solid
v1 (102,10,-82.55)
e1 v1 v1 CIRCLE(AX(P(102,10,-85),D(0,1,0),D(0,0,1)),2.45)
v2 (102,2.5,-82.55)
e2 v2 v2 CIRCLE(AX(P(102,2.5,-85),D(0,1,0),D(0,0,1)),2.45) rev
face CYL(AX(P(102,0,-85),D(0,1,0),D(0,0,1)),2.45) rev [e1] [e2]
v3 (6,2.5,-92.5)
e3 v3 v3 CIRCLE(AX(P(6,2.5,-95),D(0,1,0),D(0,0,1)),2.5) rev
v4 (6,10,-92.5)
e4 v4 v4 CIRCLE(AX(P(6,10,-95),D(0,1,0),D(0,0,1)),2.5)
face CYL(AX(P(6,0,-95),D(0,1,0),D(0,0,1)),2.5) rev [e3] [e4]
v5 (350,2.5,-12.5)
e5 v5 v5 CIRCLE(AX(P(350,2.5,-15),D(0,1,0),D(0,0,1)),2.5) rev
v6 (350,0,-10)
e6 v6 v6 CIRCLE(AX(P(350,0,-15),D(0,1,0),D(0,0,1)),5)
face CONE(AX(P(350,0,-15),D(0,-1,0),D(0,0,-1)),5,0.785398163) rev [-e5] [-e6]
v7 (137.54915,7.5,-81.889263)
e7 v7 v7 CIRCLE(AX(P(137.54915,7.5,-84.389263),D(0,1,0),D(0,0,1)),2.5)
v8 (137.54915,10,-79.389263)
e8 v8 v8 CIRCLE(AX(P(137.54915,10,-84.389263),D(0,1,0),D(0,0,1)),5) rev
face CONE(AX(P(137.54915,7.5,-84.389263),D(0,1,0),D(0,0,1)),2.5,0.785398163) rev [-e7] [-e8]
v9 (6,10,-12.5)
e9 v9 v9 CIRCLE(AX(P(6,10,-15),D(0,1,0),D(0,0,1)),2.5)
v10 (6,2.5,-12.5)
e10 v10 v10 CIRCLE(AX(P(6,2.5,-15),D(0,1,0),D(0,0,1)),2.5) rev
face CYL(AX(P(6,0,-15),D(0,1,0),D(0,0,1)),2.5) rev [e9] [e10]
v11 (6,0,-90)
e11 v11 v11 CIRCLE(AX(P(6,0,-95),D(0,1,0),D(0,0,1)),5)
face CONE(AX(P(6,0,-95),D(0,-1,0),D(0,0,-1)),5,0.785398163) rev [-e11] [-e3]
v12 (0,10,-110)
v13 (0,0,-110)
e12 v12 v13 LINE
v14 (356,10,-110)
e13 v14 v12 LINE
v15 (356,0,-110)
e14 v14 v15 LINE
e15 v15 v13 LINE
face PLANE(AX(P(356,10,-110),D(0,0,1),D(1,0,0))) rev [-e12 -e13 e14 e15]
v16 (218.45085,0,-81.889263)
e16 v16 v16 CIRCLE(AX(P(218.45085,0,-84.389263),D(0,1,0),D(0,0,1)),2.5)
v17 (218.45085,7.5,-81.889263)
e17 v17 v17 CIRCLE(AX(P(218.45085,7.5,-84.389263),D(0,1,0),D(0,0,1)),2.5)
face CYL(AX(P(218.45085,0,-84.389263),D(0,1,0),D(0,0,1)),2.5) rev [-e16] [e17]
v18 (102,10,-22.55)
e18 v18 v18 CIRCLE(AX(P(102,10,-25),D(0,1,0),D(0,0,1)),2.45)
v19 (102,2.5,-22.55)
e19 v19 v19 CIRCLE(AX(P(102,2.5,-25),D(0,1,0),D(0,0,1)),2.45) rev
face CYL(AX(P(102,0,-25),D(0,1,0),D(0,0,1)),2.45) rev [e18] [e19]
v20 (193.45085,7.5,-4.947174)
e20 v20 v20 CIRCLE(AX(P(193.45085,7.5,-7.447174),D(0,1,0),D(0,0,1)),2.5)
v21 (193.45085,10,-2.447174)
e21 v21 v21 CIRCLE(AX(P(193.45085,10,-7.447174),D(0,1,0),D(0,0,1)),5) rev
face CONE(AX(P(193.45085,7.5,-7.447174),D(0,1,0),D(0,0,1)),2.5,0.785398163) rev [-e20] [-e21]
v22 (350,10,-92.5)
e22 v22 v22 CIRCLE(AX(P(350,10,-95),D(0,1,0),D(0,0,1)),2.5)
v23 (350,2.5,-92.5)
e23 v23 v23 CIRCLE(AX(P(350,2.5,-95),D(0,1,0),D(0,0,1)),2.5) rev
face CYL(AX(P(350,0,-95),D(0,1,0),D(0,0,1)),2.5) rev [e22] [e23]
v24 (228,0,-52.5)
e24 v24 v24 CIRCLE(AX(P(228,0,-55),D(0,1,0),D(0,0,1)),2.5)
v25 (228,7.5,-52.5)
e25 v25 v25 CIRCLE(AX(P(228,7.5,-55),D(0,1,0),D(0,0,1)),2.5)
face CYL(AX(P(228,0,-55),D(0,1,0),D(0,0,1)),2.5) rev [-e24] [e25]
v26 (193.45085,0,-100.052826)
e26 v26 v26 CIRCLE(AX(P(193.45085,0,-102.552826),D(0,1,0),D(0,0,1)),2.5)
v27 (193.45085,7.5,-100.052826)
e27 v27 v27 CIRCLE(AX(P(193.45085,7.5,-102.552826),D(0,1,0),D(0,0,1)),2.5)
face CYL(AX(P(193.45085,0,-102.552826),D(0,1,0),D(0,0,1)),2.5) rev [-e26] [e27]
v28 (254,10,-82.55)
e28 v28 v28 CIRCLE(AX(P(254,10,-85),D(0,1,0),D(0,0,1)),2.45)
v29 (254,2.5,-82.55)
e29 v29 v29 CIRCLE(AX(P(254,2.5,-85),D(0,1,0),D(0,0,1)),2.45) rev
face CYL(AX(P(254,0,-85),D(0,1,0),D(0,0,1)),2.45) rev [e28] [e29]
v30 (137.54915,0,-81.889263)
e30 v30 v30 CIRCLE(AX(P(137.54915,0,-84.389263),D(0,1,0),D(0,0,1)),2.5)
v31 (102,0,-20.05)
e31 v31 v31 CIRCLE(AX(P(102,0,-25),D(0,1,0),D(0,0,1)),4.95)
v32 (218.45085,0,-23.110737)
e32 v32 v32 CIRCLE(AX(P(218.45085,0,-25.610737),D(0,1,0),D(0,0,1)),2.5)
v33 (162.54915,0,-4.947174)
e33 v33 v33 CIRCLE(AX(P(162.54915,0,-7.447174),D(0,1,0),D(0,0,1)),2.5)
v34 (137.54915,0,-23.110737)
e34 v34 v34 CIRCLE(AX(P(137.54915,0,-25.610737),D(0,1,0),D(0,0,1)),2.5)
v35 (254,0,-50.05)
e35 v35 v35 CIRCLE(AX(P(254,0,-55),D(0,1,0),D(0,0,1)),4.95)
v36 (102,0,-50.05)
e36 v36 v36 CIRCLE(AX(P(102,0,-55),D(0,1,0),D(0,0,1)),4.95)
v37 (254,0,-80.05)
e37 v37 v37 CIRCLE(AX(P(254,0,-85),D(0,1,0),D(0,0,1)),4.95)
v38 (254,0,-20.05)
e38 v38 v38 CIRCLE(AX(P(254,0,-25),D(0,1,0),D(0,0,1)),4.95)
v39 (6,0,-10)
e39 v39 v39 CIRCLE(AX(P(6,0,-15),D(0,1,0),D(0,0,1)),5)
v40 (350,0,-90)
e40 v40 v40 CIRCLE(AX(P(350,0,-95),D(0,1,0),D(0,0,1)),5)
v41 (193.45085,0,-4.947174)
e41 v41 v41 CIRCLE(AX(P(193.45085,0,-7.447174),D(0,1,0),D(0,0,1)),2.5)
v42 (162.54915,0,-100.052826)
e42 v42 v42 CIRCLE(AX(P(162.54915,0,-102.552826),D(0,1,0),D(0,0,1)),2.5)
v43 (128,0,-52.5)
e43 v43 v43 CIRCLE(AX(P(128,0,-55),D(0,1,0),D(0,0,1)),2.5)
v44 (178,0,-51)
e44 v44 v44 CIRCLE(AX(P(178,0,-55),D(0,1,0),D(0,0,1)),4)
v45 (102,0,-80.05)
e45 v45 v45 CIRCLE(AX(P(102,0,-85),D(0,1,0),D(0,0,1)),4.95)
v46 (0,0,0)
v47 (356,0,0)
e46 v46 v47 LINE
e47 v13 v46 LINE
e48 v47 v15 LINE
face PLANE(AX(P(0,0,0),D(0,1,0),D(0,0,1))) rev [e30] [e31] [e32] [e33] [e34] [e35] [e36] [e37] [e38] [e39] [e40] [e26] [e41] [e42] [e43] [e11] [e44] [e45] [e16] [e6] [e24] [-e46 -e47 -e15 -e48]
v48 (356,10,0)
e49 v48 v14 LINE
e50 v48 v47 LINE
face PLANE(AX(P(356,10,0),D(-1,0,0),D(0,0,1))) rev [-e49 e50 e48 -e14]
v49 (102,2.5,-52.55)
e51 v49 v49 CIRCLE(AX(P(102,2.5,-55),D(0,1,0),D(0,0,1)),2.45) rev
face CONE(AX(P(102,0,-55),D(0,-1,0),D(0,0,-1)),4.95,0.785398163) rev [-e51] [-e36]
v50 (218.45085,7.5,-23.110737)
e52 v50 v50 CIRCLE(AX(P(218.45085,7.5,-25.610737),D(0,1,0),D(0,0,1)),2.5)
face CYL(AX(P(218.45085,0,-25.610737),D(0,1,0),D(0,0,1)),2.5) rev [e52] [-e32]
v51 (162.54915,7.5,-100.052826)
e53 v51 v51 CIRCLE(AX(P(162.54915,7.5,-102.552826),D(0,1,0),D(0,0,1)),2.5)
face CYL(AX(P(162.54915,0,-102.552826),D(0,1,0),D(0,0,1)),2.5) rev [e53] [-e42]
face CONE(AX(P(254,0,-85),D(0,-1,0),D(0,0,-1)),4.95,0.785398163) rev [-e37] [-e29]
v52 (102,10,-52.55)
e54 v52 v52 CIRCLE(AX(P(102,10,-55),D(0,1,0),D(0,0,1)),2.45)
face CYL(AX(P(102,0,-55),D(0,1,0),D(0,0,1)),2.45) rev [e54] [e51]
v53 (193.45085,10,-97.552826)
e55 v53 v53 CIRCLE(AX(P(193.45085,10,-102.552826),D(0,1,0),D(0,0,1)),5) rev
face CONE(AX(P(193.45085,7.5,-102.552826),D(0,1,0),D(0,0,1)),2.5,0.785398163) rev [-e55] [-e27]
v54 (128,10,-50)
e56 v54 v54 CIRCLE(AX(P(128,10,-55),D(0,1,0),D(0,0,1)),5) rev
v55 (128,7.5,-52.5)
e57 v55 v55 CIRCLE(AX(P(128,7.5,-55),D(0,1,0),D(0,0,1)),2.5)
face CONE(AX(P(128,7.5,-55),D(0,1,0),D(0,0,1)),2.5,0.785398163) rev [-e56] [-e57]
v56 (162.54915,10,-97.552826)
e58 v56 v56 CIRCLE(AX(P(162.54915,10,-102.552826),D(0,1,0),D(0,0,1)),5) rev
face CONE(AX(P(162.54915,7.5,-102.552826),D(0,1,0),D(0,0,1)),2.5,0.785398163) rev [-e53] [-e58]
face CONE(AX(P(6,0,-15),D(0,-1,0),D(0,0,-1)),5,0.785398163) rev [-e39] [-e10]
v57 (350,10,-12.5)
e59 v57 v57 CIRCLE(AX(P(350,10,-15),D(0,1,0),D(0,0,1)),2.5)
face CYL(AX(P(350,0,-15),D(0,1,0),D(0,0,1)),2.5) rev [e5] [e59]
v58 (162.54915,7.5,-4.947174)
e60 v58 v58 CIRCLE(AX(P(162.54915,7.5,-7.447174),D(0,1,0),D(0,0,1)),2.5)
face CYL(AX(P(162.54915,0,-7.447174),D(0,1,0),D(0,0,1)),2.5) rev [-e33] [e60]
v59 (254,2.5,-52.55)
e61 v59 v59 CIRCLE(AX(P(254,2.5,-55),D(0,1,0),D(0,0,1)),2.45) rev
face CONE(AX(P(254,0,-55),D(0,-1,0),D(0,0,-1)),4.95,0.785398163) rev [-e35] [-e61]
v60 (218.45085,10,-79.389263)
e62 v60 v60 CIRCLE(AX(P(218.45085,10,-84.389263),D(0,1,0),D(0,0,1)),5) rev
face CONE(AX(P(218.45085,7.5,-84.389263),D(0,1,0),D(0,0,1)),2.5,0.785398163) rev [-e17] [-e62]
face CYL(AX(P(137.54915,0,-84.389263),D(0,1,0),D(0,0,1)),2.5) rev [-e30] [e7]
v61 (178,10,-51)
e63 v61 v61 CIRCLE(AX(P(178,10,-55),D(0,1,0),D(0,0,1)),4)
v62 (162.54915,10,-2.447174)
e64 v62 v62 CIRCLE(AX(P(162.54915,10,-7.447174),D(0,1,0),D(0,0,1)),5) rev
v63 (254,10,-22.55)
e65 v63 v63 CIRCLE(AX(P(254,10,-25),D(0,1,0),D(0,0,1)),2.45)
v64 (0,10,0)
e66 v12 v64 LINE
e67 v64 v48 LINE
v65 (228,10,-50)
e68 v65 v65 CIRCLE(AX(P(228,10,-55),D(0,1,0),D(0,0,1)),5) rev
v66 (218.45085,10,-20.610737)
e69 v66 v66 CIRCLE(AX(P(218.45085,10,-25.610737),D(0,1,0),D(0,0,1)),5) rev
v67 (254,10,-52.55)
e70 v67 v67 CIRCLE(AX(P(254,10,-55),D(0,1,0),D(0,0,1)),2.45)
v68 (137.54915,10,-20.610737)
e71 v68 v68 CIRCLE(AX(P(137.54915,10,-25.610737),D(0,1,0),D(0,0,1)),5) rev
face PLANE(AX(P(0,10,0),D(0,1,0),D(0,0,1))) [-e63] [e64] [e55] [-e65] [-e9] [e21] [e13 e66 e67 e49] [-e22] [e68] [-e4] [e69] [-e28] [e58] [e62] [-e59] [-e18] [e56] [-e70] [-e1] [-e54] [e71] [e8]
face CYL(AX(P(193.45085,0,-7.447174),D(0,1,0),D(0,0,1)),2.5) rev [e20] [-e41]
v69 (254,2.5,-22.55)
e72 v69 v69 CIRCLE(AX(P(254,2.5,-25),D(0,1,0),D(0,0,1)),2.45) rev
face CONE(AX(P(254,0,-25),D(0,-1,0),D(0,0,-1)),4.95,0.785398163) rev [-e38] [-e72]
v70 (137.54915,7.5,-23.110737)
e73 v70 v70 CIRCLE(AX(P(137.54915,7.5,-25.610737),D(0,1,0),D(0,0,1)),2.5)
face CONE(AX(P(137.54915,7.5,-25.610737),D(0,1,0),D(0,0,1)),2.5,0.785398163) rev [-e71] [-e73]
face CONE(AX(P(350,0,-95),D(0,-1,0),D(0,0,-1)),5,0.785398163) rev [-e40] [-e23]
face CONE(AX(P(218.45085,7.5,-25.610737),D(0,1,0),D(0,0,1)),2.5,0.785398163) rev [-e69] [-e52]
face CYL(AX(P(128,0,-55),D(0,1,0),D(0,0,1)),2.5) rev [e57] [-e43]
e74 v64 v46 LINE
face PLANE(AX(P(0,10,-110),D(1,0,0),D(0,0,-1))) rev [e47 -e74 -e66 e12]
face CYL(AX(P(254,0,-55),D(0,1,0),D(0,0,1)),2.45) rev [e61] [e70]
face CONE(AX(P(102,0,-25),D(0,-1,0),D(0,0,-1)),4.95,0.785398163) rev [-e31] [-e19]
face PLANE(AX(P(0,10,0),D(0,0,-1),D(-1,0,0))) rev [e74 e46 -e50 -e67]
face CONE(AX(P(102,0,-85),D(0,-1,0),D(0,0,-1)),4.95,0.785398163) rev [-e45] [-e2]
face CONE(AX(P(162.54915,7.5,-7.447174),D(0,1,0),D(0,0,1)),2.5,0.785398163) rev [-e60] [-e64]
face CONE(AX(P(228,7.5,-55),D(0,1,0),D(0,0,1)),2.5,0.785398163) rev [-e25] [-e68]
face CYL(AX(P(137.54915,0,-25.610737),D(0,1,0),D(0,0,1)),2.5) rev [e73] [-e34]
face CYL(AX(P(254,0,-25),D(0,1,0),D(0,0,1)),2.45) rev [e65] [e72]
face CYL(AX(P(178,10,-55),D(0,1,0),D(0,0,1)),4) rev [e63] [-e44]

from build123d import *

# Parameters (mm, degrees)
SKIZZE3_W                       = 356
SKIZZE3_H                       = 110
AUFSATZ_LINEAR_AUSTRAGEN1_DEPTH = 10
SKIZZE4_R                       = 2.5
SCHNITT_LINEAR_AUSTRAGEN1_DEPTH = 373.741197079
SKIZZE5_R                       = 2.45
SCHNITT_LINEAR_AUSTRAGEN2_DEPTH = 373.741197079
SKIZZE7_R                       = 2.5
SCHNITT_LINEAR_AUSTRAGEN3_DEPTH = 373.741197079
F_8_0_8_DURCHMESSER_BOHRUNG1_D  = 8
FASE1_SIZE                      = 2.5
FASE2_SIZE                      = 2.5


with BuildPart() as part:
    # Skizze3 → Aufsatz-Linear austragen1 (new body)
    with BuildSketch(Plane(origin=(0, 0, 0), x_dir=(1, 0, 0), z_dir=(0, 1, 0))):
        with Locations((178, 55)):
            Rectangle(SKIZZE3_W, SKIZZE3_H)
    extrude(amount=AUFSATZ_LINEAR_AUSTRAGEN1_DEPTH)

    # Skizze4 → Schnitt-Linear austragen1 (cut, through all)
    with BuildSketch(Plane(origin=(0, 10, 0), x_dir=(1, 0, 0), z_dir=(0, 1, 0))):
        with Locations(Location((128, 55, 0), (0, 0, 270))):
            Circle(SKIZZE4_R)
        with Locations(Location((137.549150281, 84.389262615, 0), (0, 0, 270))):
            Circle(SKIZZE4_R)
        with Locations(Location((162.549150281, 102.552825815, 0), (0, 0, 270))):
            Circle(SKIZZE4_R)
        with Locations(Location((193.450849719, 102.552825815, 0), (0, 0, 270))):
            Circle(SKIZZE4_R)
        with Locations(Location((218.450849719, 84.389262615, 0), (0, 0, 270))):
            Circle(SKIZZE4_R)
        with Locations(Location((228, 55, 0), (0, 0, 270))):
            Circle(SKIZZE4_R)
        with Locations(Location((218.450849719, 25.610737385, 0), (0, 0, 270))):
            Circle(SKIZZE4_R)
        with Locations(Location((193.450849719, 7.447174185, 0), (0, 0, 270))):
            Circle(SKIZZE4_R)
        with Locations(Location((162.549150281, 7.447174185, 0), (0, 0, 270))):
            Circle(SKIZZE4_R)
        with Locations(Location((137.549150281, 25.610737385, 0), (0, 0, 270))):
            Circle(SKIZZE4_R)
    extrude(amount=-SCHNITT_LINEAR_AUSTRAGEN1_DEPTH, mode=Mode.SUBTRACT)

    # Skizze5 → Schnitt-Linear austragen2 (cut, through all)
    with BuildSketch(Plane(origin=(0, 10, 0), x_dir=(1, 0, 0), z_dir=(0, 1, 0))):
        with Locations(Location((102, 85, 0), (0, 0, 270))):
            Circle(SKIZZE5_R)
        with Locations(Location((102, 25, 0), (0, 0, 270))):
            Circle(SKIZZE5_R)
        with Locations(Location((254, 25, 0), (0, 0, 270))):
            Circle(SKIZZE5_R)
        with Locations(Location((254, 85, 0), (0, 0, 270))):
            Circle(SKIZZE5_R)
        with Locations(Location((102, 55, 0), (0, 0, 270))):
            Circle(SKIZZE5_R)
        with Locations(Location((254, 55, 0), (0, 0, 270))):
            Circle(SKIZZE5_R)
    extrude(amount=-SCHNITT_LINEAR_AUSTRAGEN2_DEPTH, mode=Mode.SUBTRACT)

    # Skizze7 → Schnitt-Linear austragen3 (cut, through all)
    with BuildSketch(Plane(origin=(0, 10, 0), x_dir=(1, 0, 0), z_dir=(0, 1, 0))):
        with Locations(Location((6, 95, 0), (0, 0, 270))):
            Circle(SKIZZE7_R)
        with Locations(Location((6, 15, 0), (0, 0, 270))):
            Circle(SKIZZE7_R)
        with Locations(Location((350, 15, 0), (0, 0, 270))):
            Circle(SKIZZE7_R)
        with Locations(Location((350, 95, 0), (0, 0, 270))):
            Circle(SKIZZE7_R)
    extrude(amount=-SCHNITT_LINEAR_AUSTRAGEN3_DEPTH, mode=Mode.SUBTRACT)

    # Ø8.0 (8) Durchmesser Bohrung1 (through all)
    with Locations(Plane(origin=(0, 10, 0), x_dir=(1, 0, 0), z_dir=(0, 1, 0))):
        with Locations((178, 55)):
            Hole(F_8_0_8_DURCHMESSER_BOHRUNG1_D / 2)

    # Fase1
    fase1_edges = [part.edges().sort_by_distance(p)[0] for p in [
        (128, 10, -57.5),
        (137.549150281, 10, -28.110737385),
        (162.549150281, 10, -9.947174185),
        (193.450849719, 10, -9.947174185),
        (218.450849719, 10, -28.110737385),
        (228, 10, -57.5),
        (218.450849719, 10, -86.889262615),
        (193.450849719, 10, -105.052825815),
        (162.549150281, 10, -105.052825815),
        (137.549150281, 10, -86.889262615),
    ]]
    chamfer(fase1_edges, length=FASE1_SIZE)

    # Fase2
    fase2_edges = [part.edges().sort_by_distance(p)[0] for p in [
        (6, 0, -17.5),
        (6, 0, -97.5),
        (102, 0, -27.45),
        (254, 0, -27.45),
        (254, 0, -87.45),
        (102, 0, -57.45),
        (254, 0, -57.45),
        (102, 0, -87.45),
        (350, 0, -97.5),
        (350, 0, -17.5),
    ]]
    chamfer(fase2_edges, length=FASE2_SIZE)


solid = part.part
